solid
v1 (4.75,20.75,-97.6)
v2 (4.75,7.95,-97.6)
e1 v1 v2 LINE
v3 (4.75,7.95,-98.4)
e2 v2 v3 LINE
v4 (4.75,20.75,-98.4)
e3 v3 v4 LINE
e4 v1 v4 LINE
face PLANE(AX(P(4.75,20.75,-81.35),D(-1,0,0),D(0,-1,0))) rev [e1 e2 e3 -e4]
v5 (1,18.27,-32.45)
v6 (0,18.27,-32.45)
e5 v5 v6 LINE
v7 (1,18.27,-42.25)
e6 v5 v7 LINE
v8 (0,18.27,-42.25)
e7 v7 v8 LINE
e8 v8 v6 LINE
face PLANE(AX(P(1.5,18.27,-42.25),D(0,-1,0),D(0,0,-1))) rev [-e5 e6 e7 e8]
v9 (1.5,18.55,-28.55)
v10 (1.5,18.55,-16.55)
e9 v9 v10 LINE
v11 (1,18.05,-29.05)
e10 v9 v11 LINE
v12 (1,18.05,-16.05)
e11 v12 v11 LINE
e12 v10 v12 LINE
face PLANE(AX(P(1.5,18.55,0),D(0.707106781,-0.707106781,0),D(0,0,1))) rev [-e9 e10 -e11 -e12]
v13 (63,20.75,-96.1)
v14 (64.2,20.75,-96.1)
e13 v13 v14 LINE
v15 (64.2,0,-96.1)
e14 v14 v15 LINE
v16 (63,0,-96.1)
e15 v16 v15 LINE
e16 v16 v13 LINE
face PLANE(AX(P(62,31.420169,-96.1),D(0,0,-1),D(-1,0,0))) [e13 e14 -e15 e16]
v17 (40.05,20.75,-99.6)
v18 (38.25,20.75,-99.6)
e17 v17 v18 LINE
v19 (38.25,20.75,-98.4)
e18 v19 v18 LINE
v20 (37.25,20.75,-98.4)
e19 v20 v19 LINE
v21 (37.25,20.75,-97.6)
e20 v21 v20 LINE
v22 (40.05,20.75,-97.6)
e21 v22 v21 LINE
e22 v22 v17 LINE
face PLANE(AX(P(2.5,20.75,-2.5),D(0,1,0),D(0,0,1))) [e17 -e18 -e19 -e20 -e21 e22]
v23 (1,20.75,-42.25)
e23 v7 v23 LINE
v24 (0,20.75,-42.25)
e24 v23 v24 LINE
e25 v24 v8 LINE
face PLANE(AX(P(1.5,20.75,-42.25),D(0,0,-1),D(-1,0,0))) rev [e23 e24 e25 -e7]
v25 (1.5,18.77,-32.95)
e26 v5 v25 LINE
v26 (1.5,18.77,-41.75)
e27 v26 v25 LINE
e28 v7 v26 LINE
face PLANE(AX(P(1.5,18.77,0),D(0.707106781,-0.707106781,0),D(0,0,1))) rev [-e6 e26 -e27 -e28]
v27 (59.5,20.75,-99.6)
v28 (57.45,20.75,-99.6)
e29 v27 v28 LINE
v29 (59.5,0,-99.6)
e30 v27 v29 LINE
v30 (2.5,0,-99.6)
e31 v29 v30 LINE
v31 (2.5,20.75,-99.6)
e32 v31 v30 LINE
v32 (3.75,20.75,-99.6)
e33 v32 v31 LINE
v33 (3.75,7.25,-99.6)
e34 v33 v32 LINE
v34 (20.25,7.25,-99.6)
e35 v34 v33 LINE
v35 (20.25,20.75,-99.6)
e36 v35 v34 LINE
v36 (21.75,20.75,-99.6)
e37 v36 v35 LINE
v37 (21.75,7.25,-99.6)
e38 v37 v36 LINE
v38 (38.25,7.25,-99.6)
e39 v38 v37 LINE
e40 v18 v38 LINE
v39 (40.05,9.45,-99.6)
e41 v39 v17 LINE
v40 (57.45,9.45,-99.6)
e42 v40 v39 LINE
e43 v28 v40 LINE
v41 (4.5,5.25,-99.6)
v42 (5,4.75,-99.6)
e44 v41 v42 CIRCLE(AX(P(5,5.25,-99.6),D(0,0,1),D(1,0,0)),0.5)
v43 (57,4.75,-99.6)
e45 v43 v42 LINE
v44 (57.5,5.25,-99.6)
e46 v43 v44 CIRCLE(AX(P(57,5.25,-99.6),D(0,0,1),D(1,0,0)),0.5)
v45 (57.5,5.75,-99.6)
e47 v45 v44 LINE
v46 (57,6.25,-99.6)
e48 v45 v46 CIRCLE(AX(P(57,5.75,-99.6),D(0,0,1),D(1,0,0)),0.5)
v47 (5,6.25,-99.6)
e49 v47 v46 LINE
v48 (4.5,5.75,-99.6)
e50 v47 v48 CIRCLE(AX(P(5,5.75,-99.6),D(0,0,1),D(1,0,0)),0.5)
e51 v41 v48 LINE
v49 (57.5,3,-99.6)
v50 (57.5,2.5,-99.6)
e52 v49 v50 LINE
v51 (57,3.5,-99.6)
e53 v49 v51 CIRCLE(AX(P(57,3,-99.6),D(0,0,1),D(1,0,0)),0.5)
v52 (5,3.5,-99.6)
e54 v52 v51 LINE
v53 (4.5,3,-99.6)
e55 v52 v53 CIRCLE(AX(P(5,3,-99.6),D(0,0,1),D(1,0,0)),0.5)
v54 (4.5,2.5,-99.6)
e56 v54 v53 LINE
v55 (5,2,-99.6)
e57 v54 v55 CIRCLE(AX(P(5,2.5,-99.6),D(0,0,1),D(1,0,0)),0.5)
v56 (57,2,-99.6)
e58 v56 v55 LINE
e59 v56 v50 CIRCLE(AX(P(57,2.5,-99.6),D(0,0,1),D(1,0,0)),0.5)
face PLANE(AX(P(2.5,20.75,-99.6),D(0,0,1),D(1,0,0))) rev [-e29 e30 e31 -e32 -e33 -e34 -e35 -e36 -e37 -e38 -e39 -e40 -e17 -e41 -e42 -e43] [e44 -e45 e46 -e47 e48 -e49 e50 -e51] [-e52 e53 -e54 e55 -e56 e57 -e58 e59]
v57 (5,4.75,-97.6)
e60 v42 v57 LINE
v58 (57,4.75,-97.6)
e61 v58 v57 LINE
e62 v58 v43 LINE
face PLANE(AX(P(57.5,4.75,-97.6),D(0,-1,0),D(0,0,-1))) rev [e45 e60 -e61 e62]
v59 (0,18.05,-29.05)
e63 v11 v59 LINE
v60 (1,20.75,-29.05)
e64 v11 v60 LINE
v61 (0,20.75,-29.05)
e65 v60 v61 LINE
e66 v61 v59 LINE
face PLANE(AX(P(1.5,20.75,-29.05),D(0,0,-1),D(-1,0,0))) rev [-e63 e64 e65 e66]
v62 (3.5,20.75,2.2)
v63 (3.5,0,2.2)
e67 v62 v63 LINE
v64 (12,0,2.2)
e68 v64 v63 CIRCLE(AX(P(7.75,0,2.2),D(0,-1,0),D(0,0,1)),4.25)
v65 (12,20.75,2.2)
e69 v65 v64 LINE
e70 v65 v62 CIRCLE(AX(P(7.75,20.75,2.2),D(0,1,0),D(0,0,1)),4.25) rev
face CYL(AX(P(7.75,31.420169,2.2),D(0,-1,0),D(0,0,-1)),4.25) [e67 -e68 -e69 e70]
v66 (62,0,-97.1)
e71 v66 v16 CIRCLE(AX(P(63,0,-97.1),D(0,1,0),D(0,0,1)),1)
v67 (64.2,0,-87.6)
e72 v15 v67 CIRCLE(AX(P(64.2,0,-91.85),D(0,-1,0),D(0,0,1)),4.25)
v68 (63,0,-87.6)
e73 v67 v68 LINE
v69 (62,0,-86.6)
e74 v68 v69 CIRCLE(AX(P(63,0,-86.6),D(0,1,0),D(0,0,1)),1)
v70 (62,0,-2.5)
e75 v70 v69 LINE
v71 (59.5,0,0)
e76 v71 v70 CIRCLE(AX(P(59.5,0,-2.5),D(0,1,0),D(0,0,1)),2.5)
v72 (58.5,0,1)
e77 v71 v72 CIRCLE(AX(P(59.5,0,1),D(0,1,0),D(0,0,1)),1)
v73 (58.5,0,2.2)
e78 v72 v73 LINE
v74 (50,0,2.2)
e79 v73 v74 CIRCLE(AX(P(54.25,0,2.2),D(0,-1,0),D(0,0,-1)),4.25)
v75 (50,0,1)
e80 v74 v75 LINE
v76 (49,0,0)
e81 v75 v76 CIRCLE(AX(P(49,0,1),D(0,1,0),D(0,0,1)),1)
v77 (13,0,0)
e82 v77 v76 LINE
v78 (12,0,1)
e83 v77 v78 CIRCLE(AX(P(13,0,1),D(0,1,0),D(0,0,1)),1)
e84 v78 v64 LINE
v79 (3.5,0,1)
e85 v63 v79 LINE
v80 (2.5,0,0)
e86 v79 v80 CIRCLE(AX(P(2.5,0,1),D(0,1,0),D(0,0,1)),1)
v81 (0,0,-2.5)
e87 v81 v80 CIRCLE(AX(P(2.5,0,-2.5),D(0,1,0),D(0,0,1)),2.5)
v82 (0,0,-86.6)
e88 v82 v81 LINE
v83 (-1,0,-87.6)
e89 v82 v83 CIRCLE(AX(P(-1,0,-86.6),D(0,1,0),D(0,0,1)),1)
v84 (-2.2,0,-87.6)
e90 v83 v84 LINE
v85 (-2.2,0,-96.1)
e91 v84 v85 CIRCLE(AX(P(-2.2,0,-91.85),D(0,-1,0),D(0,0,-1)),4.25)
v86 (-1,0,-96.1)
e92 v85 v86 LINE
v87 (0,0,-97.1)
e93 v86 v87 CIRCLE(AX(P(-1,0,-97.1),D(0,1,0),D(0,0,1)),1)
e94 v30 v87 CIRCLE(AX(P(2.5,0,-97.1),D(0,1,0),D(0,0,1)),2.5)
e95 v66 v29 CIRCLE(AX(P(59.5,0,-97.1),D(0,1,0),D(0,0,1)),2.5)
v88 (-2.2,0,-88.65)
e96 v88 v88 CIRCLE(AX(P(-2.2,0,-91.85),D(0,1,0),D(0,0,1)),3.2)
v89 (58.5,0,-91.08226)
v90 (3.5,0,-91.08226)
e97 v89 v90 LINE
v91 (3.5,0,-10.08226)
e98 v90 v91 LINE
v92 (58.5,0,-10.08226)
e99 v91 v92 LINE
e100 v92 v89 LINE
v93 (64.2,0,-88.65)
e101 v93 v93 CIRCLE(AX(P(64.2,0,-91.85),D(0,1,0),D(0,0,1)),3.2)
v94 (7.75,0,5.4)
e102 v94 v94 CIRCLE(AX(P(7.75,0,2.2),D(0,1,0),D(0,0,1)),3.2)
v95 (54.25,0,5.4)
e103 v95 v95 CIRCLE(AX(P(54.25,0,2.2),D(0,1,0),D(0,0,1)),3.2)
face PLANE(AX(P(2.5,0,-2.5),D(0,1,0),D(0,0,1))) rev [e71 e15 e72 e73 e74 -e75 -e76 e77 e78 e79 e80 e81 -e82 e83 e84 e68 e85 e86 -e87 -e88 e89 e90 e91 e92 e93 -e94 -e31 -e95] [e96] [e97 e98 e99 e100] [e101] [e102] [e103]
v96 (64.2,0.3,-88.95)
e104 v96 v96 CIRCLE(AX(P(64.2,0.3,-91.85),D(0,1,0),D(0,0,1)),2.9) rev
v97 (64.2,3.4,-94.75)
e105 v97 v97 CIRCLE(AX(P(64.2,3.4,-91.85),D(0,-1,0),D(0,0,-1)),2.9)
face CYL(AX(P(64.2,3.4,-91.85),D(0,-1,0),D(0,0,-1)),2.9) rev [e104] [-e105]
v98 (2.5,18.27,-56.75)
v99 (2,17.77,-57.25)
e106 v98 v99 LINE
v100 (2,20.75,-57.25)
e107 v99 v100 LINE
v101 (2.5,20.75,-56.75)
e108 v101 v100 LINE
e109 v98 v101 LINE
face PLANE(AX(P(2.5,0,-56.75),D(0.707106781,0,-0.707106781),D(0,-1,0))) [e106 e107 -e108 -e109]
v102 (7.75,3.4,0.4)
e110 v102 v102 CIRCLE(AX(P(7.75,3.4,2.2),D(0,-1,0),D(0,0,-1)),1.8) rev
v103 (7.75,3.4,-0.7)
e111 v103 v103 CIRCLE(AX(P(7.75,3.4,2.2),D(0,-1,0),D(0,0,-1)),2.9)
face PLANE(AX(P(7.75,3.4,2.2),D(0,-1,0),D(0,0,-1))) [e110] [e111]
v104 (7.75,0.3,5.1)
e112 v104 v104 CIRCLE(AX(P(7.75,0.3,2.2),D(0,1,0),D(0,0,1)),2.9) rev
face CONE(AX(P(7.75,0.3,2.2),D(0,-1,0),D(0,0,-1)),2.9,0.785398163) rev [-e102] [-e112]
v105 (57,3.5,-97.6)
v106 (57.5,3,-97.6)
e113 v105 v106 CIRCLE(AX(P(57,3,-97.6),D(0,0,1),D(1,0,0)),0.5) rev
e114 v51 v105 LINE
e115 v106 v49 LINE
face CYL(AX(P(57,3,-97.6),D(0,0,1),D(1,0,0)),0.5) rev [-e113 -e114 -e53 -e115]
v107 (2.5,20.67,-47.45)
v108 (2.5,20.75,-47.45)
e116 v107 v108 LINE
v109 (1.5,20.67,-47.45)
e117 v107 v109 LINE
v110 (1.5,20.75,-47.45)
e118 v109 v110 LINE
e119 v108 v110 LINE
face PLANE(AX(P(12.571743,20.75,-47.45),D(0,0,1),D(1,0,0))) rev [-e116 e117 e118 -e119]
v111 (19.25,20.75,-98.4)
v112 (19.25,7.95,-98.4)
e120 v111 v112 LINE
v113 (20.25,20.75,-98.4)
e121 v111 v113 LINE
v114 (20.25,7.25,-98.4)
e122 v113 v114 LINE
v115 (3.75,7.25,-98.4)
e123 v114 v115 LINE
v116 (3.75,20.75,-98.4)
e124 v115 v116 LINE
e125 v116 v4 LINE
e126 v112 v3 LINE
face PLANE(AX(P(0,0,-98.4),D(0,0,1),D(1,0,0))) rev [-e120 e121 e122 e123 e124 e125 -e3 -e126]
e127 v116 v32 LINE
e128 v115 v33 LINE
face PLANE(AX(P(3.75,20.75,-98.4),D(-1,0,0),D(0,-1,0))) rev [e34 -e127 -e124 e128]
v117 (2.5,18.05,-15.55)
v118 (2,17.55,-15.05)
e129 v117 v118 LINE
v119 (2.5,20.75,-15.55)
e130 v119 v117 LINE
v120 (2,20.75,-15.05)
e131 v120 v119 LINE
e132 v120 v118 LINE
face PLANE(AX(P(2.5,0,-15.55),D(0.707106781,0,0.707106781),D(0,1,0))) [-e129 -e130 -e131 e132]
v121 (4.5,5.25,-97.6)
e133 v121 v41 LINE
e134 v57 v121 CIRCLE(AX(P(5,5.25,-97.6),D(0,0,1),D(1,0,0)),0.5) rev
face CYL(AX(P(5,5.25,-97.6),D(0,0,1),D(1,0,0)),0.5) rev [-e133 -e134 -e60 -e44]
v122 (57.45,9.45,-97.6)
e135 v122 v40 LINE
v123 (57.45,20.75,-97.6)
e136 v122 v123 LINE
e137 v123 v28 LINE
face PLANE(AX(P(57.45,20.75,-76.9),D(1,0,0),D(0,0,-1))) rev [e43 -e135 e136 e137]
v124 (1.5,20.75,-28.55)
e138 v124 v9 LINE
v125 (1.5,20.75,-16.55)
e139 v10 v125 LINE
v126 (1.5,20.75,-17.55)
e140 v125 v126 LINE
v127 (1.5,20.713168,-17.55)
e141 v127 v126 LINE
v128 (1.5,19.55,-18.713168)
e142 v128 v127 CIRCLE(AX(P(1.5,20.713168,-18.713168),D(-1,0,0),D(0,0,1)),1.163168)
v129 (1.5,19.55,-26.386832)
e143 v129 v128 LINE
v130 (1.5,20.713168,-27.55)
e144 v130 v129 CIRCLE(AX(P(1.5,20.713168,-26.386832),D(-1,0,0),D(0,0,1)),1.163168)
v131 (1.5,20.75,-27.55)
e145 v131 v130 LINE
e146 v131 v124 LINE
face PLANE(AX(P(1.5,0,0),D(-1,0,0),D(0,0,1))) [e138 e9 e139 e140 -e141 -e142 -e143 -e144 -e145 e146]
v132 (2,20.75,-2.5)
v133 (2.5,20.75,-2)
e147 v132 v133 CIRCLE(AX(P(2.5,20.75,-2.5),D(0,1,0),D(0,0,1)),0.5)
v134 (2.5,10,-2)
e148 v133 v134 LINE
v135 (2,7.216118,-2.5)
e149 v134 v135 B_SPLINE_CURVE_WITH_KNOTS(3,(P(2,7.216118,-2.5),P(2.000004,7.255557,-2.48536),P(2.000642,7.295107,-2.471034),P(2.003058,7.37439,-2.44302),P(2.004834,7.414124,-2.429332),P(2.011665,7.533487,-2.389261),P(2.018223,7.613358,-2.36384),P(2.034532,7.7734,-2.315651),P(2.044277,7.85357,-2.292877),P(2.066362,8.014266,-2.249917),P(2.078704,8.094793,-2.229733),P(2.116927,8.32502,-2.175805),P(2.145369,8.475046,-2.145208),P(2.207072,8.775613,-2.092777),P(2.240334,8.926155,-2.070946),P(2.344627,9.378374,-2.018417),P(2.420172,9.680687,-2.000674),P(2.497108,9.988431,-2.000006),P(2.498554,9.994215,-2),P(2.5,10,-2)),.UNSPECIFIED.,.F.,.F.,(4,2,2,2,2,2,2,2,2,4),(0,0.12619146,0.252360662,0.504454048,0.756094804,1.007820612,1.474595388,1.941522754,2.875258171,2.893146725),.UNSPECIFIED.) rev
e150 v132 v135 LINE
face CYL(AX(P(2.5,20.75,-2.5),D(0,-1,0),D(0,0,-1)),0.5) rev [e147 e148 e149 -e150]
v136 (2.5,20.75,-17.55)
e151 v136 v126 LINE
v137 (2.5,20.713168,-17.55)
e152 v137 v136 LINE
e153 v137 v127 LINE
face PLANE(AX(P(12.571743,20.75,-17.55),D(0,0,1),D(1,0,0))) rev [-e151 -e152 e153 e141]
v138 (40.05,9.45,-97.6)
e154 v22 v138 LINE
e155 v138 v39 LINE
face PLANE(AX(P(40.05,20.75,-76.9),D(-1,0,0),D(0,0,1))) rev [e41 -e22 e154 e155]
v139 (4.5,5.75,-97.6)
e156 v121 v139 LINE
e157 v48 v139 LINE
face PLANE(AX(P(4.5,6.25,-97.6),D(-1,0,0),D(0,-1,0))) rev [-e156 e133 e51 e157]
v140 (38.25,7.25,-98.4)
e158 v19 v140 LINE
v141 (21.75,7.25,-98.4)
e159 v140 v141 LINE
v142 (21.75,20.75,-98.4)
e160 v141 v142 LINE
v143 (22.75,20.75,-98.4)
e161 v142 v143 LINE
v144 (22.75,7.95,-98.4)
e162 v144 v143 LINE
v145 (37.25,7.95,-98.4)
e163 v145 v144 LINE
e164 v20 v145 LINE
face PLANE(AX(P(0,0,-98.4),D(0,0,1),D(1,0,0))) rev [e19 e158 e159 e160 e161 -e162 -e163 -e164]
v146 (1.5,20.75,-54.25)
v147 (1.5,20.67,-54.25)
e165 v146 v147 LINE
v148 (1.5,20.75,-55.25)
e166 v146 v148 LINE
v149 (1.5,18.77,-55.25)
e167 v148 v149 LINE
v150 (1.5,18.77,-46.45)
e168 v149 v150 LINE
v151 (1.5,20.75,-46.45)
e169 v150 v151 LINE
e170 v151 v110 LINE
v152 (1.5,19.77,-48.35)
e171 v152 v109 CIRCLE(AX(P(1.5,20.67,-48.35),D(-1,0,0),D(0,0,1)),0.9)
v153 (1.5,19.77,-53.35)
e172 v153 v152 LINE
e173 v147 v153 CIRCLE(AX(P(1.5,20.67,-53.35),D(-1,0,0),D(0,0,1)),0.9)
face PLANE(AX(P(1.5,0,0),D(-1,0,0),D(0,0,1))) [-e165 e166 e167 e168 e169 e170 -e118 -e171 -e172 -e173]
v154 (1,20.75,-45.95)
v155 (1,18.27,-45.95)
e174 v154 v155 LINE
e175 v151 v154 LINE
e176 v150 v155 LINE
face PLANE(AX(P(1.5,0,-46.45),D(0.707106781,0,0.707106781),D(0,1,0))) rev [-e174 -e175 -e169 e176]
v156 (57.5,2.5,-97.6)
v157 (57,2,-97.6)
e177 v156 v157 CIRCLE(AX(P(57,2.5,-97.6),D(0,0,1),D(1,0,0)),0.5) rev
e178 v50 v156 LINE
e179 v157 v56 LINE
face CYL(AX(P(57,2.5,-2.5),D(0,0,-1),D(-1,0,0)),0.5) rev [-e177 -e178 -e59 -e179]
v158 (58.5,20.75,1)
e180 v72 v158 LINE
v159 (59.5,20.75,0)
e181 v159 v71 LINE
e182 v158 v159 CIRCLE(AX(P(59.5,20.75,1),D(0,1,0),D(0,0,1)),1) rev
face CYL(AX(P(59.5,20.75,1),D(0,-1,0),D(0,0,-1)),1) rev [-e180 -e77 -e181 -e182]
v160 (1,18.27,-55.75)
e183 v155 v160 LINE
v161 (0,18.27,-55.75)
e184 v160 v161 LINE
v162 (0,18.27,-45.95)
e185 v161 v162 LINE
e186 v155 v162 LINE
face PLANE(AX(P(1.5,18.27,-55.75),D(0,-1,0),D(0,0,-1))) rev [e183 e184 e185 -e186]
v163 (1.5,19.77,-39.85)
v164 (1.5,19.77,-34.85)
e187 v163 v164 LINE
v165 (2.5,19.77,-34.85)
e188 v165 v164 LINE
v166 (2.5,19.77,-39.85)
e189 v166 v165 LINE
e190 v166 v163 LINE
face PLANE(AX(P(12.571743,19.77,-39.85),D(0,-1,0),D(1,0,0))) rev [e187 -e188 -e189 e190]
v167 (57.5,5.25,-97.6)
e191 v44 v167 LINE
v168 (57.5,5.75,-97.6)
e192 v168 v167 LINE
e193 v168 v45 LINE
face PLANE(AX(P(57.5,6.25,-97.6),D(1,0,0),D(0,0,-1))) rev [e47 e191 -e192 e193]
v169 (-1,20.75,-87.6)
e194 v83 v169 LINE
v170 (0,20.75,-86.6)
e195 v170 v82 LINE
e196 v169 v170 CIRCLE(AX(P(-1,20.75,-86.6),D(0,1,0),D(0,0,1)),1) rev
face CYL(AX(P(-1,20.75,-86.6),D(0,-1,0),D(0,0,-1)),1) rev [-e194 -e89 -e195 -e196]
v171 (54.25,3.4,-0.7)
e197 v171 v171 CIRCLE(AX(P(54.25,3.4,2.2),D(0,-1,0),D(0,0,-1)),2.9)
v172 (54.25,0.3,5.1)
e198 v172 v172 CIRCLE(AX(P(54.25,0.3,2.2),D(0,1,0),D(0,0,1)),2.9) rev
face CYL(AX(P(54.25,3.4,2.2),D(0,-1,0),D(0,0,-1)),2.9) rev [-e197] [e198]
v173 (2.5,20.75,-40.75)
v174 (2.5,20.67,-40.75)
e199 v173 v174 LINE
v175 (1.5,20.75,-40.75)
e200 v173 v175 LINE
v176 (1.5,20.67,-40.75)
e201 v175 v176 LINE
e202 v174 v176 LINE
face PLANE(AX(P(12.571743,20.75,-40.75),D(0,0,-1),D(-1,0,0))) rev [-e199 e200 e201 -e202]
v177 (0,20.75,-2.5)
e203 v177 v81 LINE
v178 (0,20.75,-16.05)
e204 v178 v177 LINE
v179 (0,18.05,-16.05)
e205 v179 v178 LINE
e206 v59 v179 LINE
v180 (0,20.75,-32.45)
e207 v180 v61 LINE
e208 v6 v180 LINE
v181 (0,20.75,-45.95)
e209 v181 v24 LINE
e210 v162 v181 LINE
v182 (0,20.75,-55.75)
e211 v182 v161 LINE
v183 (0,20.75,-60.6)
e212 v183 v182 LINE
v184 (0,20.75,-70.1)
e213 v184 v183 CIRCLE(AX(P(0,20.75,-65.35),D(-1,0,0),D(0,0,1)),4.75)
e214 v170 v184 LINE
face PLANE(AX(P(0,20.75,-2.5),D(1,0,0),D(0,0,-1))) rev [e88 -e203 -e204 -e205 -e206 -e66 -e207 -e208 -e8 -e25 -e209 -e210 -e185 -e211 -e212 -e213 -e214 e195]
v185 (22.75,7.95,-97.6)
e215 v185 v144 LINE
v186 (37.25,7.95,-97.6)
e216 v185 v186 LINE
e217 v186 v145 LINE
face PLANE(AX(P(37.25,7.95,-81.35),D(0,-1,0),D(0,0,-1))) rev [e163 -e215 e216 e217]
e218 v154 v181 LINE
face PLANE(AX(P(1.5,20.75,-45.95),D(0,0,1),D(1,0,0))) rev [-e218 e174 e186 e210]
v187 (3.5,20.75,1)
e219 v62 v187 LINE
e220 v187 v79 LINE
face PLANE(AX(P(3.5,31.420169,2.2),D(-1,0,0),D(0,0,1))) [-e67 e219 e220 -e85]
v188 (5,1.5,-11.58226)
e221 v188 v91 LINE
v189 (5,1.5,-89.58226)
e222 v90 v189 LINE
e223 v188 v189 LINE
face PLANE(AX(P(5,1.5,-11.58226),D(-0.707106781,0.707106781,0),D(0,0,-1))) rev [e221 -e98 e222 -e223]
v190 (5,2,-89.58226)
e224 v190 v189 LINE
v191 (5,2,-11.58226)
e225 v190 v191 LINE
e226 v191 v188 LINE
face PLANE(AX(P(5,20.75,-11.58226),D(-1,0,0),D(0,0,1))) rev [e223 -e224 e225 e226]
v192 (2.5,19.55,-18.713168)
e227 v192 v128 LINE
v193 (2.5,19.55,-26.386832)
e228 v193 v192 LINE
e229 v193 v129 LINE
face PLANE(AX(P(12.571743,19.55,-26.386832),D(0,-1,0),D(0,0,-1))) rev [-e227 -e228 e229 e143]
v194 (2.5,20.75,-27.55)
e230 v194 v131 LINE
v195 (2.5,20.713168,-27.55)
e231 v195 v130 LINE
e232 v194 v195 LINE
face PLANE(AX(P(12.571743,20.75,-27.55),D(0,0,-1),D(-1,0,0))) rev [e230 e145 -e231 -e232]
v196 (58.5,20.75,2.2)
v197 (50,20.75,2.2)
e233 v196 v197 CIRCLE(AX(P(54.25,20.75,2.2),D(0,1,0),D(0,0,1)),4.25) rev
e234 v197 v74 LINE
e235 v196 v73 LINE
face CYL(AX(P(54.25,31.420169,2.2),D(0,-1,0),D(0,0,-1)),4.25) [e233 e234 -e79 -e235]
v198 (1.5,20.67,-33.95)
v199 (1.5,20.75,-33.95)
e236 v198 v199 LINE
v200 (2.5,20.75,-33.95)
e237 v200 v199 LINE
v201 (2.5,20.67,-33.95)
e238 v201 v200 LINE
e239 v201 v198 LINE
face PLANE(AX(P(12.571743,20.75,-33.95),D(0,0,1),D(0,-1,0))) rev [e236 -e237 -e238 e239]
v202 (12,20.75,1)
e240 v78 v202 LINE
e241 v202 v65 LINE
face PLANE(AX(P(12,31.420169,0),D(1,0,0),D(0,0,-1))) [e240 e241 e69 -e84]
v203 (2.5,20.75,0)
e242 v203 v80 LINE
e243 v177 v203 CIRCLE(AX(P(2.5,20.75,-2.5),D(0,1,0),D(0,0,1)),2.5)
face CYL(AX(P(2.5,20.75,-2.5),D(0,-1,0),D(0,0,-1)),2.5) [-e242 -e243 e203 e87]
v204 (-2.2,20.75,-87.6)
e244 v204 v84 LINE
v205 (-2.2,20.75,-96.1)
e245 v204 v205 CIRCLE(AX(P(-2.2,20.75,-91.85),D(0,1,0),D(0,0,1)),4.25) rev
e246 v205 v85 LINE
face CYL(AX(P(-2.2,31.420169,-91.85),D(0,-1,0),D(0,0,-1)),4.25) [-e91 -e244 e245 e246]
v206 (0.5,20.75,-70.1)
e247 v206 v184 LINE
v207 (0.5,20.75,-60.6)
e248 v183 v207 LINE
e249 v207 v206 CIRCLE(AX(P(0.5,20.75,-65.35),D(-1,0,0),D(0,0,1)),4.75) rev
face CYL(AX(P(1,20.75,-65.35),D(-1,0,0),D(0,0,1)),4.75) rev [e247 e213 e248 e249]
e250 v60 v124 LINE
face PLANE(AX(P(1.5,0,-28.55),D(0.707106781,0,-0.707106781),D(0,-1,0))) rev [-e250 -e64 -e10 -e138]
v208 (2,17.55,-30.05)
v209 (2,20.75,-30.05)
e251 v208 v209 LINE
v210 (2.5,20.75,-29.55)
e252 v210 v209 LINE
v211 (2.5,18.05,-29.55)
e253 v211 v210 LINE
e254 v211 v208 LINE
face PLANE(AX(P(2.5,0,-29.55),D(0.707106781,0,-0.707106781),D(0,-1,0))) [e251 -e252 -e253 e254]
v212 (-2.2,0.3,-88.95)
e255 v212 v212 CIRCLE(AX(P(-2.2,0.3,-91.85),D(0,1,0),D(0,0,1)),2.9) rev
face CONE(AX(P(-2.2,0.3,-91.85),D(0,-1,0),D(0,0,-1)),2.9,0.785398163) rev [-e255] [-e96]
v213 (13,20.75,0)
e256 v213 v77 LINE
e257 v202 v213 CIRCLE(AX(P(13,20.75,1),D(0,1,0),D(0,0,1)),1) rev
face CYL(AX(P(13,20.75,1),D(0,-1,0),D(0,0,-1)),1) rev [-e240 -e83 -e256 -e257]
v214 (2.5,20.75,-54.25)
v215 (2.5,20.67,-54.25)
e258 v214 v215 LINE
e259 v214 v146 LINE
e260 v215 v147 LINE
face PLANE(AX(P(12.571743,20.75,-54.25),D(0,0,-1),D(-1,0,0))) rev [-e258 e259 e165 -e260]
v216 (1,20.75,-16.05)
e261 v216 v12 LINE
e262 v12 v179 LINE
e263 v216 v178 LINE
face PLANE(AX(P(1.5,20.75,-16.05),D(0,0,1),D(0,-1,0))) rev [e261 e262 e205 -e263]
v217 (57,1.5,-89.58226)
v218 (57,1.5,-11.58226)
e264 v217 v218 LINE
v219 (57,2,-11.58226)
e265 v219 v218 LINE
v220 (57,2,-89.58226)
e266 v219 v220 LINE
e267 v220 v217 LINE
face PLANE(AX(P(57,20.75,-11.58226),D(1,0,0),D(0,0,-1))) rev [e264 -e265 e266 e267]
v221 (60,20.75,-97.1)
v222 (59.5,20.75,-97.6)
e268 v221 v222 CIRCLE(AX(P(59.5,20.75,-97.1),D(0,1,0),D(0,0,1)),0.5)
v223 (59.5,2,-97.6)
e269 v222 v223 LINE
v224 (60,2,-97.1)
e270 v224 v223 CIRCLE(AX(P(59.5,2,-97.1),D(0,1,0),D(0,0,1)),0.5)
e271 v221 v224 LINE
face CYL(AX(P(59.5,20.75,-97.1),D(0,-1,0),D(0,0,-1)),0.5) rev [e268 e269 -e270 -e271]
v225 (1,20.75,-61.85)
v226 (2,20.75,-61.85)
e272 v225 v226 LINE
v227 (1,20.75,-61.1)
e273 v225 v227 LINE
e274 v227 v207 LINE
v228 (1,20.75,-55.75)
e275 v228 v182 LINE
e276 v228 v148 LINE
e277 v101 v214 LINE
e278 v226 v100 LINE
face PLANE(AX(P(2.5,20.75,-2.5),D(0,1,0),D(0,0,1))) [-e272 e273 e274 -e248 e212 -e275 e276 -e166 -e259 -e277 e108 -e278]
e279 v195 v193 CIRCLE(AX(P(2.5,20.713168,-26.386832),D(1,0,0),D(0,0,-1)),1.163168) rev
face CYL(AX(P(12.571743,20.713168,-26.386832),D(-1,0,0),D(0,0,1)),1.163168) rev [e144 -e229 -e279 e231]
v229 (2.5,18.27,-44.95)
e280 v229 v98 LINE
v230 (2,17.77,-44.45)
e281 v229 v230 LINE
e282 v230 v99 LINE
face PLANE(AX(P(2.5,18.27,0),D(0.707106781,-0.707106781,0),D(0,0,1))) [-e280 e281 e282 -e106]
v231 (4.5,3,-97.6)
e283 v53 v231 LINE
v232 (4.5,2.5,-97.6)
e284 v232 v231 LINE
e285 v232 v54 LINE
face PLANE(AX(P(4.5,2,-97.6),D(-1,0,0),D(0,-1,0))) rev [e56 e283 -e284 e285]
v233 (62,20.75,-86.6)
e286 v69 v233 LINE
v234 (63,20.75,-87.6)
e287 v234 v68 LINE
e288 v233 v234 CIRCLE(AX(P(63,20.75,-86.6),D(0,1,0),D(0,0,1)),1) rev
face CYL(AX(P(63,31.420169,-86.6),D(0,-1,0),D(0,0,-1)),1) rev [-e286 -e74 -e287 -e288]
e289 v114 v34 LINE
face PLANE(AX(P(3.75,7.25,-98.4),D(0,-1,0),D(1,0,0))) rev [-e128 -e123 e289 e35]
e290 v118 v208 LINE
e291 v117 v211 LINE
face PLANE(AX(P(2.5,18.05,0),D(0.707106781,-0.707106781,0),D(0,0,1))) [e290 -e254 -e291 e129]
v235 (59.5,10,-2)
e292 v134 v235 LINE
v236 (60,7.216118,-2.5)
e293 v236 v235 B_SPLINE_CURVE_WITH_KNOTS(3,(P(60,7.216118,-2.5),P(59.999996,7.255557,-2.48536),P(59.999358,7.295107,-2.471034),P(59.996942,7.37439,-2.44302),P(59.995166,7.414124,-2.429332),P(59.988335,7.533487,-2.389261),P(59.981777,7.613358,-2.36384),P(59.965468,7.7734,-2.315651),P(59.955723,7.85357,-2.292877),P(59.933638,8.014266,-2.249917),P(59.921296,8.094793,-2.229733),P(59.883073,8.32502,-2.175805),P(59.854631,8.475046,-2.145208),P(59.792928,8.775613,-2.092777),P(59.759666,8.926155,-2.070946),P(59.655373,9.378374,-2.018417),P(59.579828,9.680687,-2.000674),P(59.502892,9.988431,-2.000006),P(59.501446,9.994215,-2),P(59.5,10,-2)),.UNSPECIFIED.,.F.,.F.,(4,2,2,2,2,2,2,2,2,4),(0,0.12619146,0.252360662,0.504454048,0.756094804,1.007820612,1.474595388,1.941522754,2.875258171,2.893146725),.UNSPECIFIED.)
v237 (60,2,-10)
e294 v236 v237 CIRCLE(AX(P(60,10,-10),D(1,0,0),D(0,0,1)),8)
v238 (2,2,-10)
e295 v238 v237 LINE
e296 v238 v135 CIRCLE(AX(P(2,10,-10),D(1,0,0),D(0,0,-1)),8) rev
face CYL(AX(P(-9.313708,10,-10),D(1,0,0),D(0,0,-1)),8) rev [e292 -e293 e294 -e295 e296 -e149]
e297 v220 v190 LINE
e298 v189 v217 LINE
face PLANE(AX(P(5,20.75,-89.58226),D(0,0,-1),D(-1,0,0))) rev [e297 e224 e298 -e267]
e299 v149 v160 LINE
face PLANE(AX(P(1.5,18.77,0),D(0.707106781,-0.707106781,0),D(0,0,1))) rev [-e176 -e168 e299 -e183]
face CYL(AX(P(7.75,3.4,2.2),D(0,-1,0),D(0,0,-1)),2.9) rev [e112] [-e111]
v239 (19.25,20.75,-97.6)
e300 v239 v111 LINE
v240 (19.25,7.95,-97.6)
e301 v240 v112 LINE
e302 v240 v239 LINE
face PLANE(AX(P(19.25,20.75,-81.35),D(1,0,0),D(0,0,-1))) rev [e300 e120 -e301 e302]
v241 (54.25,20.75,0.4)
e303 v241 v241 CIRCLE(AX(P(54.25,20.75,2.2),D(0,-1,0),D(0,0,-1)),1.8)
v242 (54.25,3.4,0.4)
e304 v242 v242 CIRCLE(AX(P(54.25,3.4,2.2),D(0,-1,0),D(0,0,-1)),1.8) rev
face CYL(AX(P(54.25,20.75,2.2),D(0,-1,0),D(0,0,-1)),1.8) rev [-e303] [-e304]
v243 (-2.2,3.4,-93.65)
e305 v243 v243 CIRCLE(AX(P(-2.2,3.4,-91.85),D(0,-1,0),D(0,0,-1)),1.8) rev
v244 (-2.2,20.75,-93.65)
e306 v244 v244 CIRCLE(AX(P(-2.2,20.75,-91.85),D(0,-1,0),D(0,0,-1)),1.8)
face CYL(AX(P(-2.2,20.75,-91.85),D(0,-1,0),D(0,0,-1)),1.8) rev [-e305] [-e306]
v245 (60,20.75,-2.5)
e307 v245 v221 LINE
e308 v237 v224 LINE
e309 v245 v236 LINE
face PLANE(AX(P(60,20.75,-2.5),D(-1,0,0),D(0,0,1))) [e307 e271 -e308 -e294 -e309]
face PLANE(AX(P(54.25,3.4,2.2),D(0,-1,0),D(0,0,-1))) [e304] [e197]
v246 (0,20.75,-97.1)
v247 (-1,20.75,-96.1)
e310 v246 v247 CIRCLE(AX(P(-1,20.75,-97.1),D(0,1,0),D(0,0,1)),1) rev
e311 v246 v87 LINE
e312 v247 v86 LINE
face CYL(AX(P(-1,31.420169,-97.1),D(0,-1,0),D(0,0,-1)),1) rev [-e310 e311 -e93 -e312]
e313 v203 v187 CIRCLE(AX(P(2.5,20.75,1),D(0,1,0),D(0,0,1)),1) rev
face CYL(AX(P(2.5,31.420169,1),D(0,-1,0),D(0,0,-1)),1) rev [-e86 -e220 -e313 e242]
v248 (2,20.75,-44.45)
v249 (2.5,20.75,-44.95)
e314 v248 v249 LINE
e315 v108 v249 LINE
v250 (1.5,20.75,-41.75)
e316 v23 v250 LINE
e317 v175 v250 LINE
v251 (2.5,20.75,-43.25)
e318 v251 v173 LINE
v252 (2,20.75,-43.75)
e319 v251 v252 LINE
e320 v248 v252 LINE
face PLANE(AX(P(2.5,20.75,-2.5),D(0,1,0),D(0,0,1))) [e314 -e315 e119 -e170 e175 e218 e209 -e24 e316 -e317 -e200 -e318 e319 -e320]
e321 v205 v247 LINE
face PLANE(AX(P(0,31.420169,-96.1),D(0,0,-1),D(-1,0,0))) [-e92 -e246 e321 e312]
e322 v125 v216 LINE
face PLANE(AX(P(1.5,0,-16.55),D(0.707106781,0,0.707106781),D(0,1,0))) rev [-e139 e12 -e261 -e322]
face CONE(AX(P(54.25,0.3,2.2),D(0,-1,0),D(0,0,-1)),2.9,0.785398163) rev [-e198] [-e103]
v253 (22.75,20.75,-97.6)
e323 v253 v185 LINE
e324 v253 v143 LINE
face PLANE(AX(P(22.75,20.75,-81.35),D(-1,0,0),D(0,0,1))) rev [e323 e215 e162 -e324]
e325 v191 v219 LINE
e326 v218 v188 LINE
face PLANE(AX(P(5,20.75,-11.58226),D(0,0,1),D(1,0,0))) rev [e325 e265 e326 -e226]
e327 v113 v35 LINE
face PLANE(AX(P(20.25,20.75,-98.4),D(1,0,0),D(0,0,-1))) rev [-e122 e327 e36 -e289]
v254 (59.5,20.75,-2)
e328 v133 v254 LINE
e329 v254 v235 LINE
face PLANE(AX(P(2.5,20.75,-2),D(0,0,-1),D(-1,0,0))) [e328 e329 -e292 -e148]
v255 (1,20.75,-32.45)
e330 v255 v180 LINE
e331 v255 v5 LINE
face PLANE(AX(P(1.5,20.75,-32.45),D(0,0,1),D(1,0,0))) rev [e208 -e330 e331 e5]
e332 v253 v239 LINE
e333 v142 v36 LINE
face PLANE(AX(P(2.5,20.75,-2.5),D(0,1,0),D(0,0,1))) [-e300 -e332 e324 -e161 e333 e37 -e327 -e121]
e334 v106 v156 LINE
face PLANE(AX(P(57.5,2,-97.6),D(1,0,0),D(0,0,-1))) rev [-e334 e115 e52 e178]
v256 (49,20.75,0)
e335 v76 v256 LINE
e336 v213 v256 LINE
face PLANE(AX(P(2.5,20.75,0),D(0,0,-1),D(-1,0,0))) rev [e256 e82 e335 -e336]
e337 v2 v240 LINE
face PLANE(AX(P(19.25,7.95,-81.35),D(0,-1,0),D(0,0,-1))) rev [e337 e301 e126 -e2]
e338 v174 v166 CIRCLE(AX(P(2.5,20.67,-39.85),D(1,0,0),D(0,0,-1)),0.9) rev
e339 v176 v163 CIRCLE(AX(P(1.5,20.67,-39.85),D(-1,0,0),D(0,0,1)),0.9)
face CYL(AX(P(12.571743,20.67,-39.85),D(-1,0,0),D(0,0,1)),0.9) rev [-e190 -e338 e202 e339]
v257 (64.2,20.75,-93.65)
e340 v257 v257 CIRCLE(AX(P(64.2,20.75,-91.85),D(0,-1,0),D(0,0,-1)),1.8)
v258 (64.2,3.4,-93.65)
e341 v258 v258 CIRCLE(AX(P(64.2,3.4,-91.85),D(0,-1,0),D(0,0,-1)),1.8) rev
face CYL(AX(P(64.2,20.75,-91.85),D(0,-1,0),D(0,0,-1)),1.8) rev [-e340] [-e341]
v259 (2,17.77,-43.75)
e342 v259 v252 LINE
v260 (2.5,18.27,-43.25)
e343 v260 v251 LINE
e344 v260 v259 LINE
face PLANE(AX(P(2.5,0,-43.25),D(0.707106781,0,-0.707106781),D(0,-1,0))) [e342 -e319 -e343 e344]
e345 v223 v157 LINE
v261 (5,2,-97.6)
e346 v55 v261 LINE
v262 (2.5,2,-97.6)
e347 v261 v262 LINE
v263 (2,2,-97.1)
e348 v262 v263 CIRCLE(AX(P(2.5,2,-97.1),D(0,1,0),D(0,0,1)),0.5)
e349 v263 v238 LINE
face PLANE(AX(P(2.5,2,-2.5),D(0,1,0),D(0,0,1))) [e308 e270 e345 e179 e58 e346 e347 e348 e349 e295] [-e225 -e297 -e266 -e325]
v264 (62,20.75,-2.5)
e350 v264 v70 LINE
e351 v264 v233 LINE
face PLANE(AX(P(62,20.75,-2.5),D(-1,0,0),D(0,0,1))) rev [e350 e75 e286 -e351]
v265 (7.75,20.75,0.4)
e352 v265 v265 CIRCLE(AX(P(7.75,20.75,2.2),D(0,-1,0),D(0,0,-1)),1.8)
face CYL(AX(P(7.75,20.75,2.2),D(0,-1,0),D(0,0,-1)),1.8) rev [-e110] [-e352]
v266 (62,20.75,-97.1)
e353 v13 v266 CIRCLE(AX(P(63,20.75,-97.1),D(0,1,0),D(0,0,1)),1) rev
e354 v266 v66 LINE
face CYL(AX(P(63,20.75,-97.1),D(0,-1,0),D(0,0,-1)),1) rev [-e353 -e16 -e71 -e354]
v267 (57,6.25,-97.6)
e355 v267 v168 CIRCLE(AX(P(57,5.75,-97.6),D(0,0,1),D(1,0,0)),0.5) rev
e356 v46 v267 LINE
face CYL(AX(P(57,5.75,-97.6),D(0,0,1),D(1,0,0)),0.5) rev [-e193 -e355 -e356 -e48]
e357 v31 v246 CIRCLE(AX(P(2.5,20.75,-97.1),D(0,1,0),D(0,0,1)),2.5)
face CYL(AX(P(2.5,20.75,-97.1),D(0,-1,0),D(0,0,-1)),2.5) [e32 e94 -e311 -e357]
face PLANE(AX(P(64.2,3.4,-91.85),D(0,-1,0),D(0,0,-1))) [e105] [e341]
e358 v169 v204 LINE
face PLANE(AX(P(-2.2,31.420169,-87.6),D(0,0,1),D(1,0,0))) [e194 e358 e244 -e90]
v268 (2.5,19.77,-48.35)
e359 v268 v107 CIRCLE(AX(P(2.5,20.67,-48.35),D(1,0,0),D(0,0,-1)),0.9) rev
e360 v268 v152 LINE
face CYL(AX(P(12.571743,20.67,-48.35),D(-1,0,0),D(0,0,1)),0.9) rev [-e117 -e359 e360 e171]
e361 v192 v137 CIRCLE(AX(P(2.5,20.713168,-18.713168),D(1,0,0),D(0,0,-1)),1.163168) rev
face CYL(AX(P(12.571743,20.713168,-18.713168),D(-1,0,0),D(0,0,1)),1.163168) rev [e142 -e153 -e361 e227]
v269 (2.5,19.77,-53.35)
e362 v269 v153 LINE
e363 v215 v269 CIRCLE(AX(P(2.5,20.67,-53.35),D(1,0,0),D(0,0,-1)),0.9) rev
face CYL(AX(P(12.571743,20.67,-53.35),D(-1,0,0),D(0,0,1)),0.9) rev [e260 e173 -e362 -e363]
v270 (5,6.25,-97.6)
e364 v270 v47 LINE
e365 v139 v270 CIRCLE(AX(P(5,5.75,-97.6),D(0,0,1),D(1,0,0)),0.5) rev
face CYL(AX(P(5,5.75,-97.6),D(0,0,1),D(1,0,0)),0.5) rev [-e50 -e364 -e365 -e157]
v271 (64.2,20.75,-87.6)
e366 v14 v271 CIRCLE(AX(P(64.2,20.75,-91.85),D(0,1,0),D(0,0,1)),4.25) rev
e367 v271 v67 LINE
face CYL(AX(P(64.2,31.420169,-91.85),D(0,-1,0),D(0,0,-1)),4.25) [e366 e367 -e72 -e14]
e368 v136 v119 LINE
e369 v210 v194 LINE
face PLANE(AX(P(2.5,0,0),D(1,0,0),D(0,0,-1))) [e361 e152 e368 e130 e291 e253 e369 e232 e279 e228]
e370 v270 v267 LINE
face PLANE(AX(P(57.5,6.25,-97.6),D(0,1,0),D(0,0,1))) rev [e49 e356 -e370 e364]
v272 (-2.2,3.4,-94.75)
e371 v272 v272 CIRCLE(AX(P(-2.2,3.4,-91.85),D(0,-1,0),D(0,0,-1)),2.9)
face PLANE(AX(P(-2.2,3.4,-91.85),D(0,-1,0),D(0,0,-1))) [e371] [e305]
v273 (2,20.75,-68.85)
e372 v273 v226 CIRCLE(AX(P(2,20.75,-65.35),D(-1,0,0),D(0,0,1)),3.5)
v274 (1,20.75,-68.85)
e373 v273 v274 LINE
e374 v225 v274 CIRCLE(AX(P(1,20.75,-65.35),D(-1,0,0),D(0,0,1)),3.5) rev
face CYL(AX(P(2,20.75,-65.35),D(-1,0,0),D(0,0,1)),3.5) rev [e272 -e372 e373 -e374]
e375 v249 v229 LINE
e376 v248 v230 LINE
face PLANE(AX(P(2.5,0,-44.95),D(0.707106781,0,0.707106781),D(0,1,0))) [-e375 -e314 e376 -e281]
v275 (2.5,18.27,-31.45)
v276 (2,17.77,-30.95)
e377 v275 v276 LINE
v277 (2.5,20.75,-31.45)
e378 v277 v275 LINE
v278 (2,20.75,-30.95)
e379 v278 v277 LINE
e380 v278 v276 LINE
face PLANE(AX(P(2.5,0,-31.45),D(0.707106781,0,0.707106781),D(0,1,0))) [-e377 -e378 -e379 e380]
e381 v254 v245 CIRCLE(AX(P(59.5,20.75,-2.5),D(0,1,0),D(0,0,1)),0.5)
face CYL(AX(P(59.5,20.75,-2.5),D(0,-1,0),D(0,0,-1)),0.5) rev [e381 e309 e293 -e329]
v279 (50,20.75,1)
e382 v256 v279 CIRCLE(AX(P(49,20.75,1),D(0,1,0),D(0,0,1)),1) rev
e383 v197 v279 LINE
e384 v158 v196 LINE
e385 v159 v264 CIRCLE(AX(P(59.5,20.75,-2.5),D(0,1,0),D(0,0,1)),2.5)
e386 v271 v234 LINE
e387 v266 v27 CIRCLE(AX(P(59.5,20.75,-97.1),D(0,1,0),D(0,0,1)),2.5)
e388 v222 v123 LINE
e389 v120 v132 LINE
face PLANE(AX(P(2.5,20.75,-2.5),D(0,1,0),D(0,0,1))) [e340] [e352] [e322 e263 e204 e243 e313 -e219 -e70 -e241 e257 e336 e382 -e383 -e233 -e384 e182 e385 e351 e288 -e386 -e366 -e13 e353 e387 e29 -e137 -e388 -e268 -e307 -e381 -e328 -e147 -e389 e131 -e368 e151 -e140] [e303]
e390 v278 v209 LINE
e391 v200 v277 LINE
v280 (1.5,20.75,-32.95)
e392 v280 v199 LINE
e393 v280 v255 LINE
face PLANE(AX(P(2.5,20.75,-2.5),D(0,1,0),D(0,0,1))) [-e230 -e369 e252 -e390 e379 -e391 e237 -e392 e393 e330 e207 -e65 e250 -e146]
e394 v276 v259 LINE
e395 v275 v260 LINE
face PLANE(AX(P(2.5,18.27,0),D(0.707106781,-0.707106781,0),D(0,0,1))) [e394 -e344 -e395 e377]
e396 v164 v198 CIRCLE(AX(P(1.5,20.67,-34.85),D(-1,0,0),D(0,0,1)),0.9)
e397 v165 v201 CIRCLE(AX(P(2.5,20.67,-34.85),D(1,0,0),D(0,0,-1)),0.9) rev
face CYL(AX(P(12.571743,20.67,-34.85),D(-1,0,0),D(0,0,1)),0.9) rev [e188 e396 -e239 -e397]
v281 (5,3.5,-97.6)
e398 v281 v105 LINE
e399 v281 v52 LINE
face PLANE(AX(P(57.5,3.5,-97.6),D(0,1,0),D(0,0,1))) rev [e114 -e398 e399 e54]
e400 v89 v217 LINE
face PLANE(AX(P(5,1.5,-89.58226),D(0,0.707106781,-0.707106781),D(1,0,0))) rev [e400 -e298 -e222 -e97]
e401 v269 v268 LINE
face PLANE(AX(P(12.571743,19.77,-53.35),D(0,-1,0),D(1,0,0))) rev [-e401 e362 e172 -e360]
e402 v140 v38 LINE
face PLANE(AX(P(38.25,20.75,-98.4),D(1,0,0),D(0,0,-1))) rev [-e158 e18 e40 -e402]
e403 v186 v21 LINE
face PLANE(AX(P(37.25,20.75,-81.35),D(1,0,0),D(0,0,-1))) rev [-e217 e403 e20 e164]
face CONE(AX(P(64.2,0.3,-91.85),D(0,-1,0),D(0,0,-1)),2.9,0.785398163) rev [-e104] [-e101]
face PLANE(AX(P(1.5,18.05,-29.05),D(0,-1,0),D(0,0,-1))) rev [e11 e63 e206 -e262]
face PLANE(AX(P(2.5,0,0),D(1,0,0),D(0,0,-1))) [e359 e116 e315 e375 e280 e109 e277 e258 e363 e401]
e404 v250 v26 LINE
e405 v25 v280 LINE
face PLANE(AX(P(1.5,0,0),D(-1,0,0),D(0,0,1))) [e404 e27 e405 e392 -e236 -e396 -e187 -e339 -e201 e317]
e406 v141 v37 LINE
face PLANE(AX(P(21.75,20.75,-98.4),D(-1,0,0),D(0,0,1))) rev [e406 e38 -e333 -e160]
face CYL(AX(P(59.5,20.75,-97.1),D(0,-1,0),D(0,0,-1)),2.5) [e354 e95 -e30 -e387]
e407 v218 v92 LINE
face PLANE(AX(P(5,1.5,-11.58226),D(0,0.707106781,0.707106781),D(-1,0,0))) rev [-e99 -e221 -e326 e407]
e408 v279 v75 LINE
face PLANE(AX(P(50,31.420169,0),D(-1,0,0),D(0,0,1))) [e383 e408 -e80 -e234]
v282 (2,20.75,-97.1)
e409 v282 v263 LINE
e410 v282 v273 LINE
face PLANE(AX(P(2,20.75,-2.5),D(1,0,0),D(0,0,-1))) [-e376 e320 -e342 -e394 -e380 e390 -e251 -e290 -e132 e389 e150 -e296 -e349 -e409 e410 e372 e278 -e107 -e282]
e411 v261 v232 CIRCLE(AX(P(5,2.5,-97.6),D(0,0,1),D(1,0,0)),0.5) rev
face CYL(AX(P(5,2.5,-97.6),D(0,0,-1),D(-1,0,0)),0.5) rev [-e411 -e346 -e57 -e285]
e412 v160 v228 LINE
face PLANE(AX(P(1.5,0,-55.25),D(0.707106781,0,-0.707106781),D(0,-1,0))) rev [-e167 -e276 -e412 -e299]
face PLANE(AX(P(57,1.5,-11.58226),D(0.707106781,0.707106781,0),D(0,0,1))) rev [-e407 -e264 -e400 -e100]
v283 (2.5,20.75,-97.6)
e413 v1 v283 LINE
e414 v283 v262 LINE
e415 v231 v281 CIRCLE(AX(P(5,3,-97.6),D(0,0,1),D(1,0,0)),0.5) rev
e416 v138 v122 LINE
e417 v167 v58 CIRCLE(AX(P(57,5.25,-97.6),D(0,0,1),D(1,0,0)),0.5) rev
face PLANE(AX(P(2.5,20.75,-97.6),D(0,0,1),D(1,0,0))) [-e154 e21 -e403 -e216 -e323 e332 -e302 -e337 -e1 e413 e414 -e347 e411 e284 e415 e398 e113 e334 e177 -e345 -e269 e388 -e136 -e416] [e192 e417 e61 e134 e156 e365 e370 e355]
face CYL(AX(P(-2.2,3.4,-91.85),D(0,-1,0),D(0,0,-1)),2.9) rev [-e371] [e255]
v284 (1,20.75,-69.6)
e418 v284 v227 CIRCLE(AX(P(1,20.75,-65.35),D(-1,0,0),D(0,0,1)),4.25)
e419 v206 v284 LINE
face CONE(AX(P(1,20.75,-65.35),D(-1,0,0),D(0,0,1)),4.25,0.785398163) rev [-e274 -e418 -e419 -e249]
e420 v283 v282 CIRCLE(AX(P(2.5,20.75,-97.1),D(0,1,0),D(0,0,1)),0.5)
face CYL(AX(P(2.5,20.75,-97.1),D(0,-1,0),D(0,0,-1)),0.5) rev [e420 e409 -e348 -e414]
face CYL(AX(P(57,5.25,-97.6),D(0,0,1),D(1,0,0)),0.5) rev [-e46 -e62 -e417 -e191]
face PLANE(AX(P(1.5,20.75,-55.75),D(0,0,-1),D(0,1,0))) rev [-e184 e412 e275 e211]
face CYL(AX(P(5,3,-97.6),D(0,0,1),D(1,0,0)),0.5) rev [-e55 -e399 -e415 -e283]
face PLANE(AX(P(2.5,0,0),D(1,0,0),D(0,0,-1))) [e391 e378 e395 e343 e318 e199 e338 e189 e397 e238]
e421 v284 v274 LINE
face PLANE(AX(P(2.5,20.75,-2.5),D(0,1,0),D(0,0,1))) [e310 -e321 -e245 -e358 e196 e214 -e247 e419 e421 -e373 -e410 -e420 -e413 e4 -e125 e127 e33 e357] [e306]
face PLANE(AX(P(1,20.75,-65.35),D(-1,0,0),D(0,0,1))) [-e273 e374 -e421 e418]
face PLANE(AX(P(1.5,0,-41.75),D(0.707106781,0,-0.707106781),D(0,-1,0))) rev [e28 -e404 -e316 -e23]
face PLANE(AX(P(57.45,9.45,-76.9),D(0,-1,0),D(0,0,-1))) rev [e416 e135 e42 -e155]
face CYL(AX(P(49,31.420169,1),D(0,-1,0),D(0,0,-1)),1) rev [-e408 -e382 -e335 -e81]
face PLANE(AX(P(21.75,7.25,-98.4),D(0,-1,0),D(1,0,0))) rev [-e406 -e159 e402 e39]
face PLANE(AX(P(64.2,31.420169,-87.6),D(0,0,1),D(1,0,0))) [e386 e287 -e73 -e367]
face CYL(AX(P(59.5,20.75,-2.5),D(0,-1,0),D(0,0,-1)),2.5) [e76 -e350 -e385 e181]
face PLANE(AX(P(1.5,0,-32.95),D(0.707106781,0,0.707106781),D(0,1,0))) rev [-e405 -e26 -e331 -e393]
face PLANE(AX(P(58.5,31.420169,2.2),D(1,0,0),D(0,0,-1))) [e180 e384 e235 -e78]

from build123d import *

# Parameters (mm, degrees)
BASE_DEPTH                      = 20.75
SHELL_T                         = -2
CLAMPS_DEPTH                    = 20.75
CLAMP_FILLETS_R                 = 1
SKETCH20_R                      = 1.8
CLAMP_HOLES_DEPTH               = 123.621878146
SKETCH21_R                      = 2.9
CLAMP_COUNTERSINKS_DEPTH        = 3.4
CLAMP_COUNTERSINK_CHAMFERS_SIZE = 0.3
SKETCH24_W                      = 14.5
SKETCH24_H                      = 12.8
USB_CUTOUT_DEPTH                = 18.25
SKETCH25_W                      = 16.5
SKETCH25_H                      = 13.5
USB_APPROACH_DEPTH              = 1.2
SKETCH28_W                      = 17.4
SKETCH28_H                      = 11.3
RJ45_CUTOUT_DEPTH               = 22.7
SKETCH29_W                      = 15
SKETCH29_H                      = 3.2
USB_C_SUPPORT_DEPTH             = 0.5
USB_C_SUPPORT_CHAMFER_SIZE      = 0.5
SKETCH30_W                      = 13
SKETCH30_H                      = 2.7
USB_C_APPROACH_DEPTH            = 1.5
USB_C_APPROACH_CHAMFER_SIZE     = 0.5
SKETCH36_W                      = 9.8
SKETCH36_H                      = 2.48
HDMI_APPROACH_DEPTH             = 1.5
HDMI_APPROACH_CHAMFER_SIZE      = 0.5
SKETCH37_W                      = 12.8
SKETCH37_H                      = 2.98
HDMI_SUPPORT_DEPTH              = 0.5
HDMI_SUPPORT_CHAMFER_SIZE       = 0.5
HDMI_CUTOUT_DEPTH               = 1
SKETCH32_R                      = 3.5
AUDIO_CUTOUT_DEPTH              = 2
SKETCH33_R                      = 4.75
AUDIO_APPROACH_DEPTH            = 1
AUDIO_APPROACH_CHAMFER_SIZE     = 0.5
AIR_SCOOP_REACH                 = 123.517
SKETCH41_W                      = 53
SKETCH41_H                      = 1.5
VENT_DEPTH                      = 2
VENT_FILLET_R                   = 0.5
SKETCH40_W                      = 52
SKETCH40_H                      = 78
SCREEN_CUTOUT_DEPTH             = 123.621878163
CHAMFER1_SIZE                   = 1.5


with BuildPart() as part:
    # Sketch2 → Base (new body)
    with BuildSketch(Plane(origin=(0, 0, 0), x_dir=(1, 0, 0), z_dir=(0, 1, 0))):
        with BuildLine():
            Line((2.5, 0), (59.5, 0))
            ThreePointArc((59.5, 0), (61.267766953, 0.732233047), (62, 2.5))
            Line((62, 2.5), (62, 97.1))
            ThreePointArc((62, 97.1), (61.267766953, 98.867766953), (59.5, 99.6))
            Line((59.5, 99.6), (2.5, 99.6))
            ThreePointArc((2.5, 99.6), (0.732233047, 98.867766953), (0, 97.1))
            Line((0, 97.1), (0, 2.5))
            ThreePointArc((0, 2.5), (0.732233047, 0.732233047), (2.5, 0))
        make_face()
    extrude(amount=BASE_DEPTH)

    # Shell
    shell_openings = [part.faces().sort_by_distance(p)[0] for p in [
        (31, 20.75, -49.8),
    ]]
    offset(amount=SHELL_T, openings=shell_openings, kind=Kind.INTERSECTION)

    # Sketch14 → Clamps (add)
    with BuildSketch(Plane.XZ):
        with BuildLine():
            Line((-2.2, -87.6), (0, -87.6))
            Line((0, -87.6), (0, -96.1))
            Line((0, -96.1), (-2.2, -96.1))
            ThreePointArc((-2.2, -96.1), (-6.45, -91.85), (-2.2, -87.6))
        make_face()
        with BuildLine():
            Line((3.5, 2.2), (3.5, 0))
            Line((3.5, 0), (12, 0))
            Line((12, 0), (12, 2.2))
            ThreePointArc((12, 2.2), (7.75, 6.45), (3.5, 2.2))
        make_face()
        with BuildLine():
            Line((64.2, -87.6), (62, -87.6))
            Line((62, -87.6), (62, -96.1))
            Line((62, -96.1), (64.2, -96.1))
            ThreePointArc((64.2, -96.1), (68.45, -91.85), (64.2, -87.6))
        make_face()
        with BuildLine():
            Line((50, 0), (50, 2.2))
            ThreePointArc((50, 2.2), (54.25, 6.45), (58.5, 2.2))
            Line((58.5, 2.2), (58.5, 0))
            Line((58.5, 0), (50, 0))
        make_face()
    extrude(amount=-CLAMPS_DEPTH)

    # Clamp Fillets
    clamp_fillets_edges = [part.edges().sort_by_distance(p)[0] for p in [
        (0, 10.375, -96.1),
        (0, 10.375, -87.6),
        (3.5, 10.375, 0),
        (12, 10.375, 0),
        (62, 10.375, -87.6),
        (62, 10.375, -96.1),
        (50, 10.375, 0),
        (58.5, 10.375, 0),
    ]]
    fillet(clamp_fillets_edges, radius=CLAMP_FILLETS_R - 0.0001)  # a hair under: the kernel refuses the full size

    # Sketch20 → Clamp Holes (cut, through all)
    with BuildSketch(Plane.XZ):
        with Locations(Location((7.75, 2.2, 0), (0, 0, 270))):
            Circle(SKETCH20_R)
        with Locations(Location((54.25, 2.2, 0), (0, 0, 270))):
            Circle(SKETCH20_R)
        with Locations(Location((64.2, -91.85, 0), (0, 0, 270))):
            Circle(SKETCH20_R)
        with Locations(Location((-2.2, -91.85, 0), (0, 0, 270))):
            Circle(SKETCH20_R)
    extrude(amount=-CLAMP_HOLES_DEPTH, mode=Mode.SUBTRACT)

    # Sketch21 → Clamp Countersinks (cut)
    with BuildSketch(Plane.XZ):
        with Locations(Location((7.75, 2.2, 0), (0, 0, 270))):
            Circle(SKETCH21_R)
        with Locations(Location((54.25, 2.2, 0), (0, 0, 270))):
            Circle(SKETCH21_R)
        with Locations(Location((64.2, -91.85, 0), (0, 0, 270))):
            Circle(SKETCH21_R)
        with Locations(Location((-2.2, -91.85, 0), (0, 0, 270))):
            Circle(SKETCH21_R)
    extrude(amount=-CLAMP_COUNTERSINKS_DEPTH, mode=Mode.SUBTRACT)

    # Clamp Countersink Chamfers
    clamp_countersink_chamfers_edges = [part.edges().sort_by_distance(p)[0] for p in [
        (-2.2, 0, -88.95),
        (64.2, 0, -88.95),
        (54.25, 0, 5.1),
        (7.75, 0, 5.1),
    ]]
    chamfer(clamp_countersink_chamfers_edges, length=CLAMP_COUNTERSINK_CHAMFERS_SIZE)

    # Sketch24 → USB Cutout (cut)
    with BuildSketch(Plane(origin=(0, 0, -99.6), x_dir=(-1, 0, 0), z_dir=(0, 0, -1))):
        with Locations((-30, 14.35)):
            Rectangle(SKETCH24_W, SKETCH24_H)
        with Locations((-12, 14.35)):
            Rectangle(SKETCH24_W, SKETCH24_H)
    extrude(amount=-USB_CUTOUT_DEPTH, mode=Mode.SUBTRACT)

    # Sketch25 → USB Approach (cut)
    with BuildSketch(Plane(origin=(0, 0, -99.6), x_dir=(-1, 0, 0), z_dir=(0, 0, -1))):
        with Locations((-30, 14)):
            Rectangle(SKETCH25_W, SKETCH25_H)
        with Locations((-12, 14)):
            Rectangle(SKETCH25_W, SKETCH25_H)
    extrude(amount=-USB_APPROACH_DEPTH, mode=Mode.SUBTRACT)

    # Sketch28 → RJ45 Cutout (cut)
    with BuildSketch(Plane(origin=(0, 0, -99.6), x_dir=(-1, 0, 0), z_dir=(0, 0, -1))):
        with Locations((-48.75, 15.1)):
            Rectangle(SKETCH28_W, SKETCH28_H)
    extrude(amount=-RJ45_CUTOUT_DEPTH, mode=Mode.SUBTRACT)

    # Sketch29 → USB-C Support (add)
    with BuildSketch(Plane(origin=(2, 0, 0), x_dir=(0, 0, -1), z_dir=(1, 0, 0))):
        with Locations((22.55, 19.15)):
            Rectangle(SKETCH29_W, SKETCH29_H)
    extrude(amount=USB_C_SUPPORT_DEPTH)

    # USB-C Support Chamfer
    usb_c_support_chamfer_edges = [part.edges().sort_by_distance(p)[0] for p in [
        (2.5, 19.15, -30.05),
        (2.5, 17.55, -22.55),
        (2.5, 19.15, -15.05),
    ]]
    chamfer(usb_c_support_chamfer_edges, length=USB_C_SUPPORT_CHAMFER_SIZE - 0.0001)  # a hair under: the kernel refuses the full size

    # Sketch30 → USB-C Approach (cut)
    with BuildSketch(Plane.ZY):
        with Locations((-22.55, 19.4)):
            Rectangle(SKETCH30_W, SKETCH30_H)
    extrude(amount=-USB_C_APPROACH_DEPTH, mode=Mode.SUBTRACT)

    # USB-C Approach Chamfer
    usb_c_approach_chamfer_edges = [part.edges().sort_by_distance(p)[0] for p in [
        (1.5, 19.4, -29.05),
        (1.5, 19.4, -16.05),
        (1.5, 18.05, -22.55),
    ]]
    chamfer(usb_c_approach_chamfer_edges, length=USB_C_APPROACH_CHAMFER_SIZE)

    # Sketch36 → HDMI Approach (cut)
    with BuildSketch(Plane.ZY):
        with Locations((-50.85, 19.51)):
            Rectangle(SKETCH36_W, SKETCH36_H)
        with Locations((-37.35, 19.51)):
            Rectangle(SKETCH36_W, SKETCH36_H)
    extrude(amount=-HDMI_APPROACH_DEPTH, mode=Mode.SUBTRACT)

    # HDMI Approach Chamfer
    hdmi_approach_chamfer_edges = [part.edges().sort_by_distance(p)[0] for p in [
        (1.5, 19.51, -55.75),
        (1.5, 19.51, -45.95),
        (1.5, 18.27, -50.85),
        (1.5, 19.51, -42.25),
        (1.5, 19.51, -32.45),
        (1.5, 18.27, -37.35),
    ]]
    chamfer(hdmi_approach_chamfer_edges, length=HDMI_APPROACH_CHAMFER_SIZE)

    # Sketch37 → HDMI Support (add)
    with BuildSketch(Plane(origin=(2, 0, 0), x_dir=(0, 0, -1), z_dir=(1, 0, 0))):
        with Locations((37.35, 19.26)):
            Rectangle(SKETCH37_W, SKETCH37_H)
        with Locations((50.85, 19.26)):
            Rectangle(SKETCH37_W, SKETCH37_H)
    extrude(amount=HDMI_SUPPORT_DEPTH)

    # HDMI Support Chamfer
    hdmi_support_chamfer_edges = [part.edges().sort_by_distance(p)[0] for p in [
        (2.5, 19.26, -57.25),
        (2.5, 17.77, -50.85),
        (2.5, 19.26, -44.45),
        (2.5, 19.26, -43.75),
        (2.5, 17.77, -37.35),
        (2.5, 19.26, -30.95),
    ]]
    chamfer(hdmi_support_chamfer_edges, length=HDMI_SUPPORT_CHAMFER_SIZE - 0.0001)  # a hair under: the kernel refuses the full size

    # Sketch38 → HDMI Cutout (cut)
    with BuildSketch(Plane.ZY.offset(-1.5)):
        with BuildLine():
            Line((-54.25, 20.75), (-47.45, 20.75))
            Line((-47.45, 20.75), (-47.45, 20.67))
            ThreePointArc((-47.45, 20.67), (-47.713603897, 20.033603897), (-48.35, 19.77))
            Line((-48.35, 19.77), (-53.35, 19.77))
            ThreePointArc((-53.35, 19.77), (-53.986396103, 20.033603897), (-54.25, 20.67))
            Line((-54.25, 20.67), (-54.25, 20.75))
        make_face()
        with BuildLine():
            Line((-40.75, 20.75), (-33.95, 20.75))
            Line((-33.95, 20.75), (-33.95, 20.67))
            ThreePointArc((-33.95, 20.67), (-34.213603897, 20.033603897), (-34.85, 19.77))
            Line((-34.85, 19.77), (-39.85, 19.77))
            ThreePointArc((-39.85, 19.77), (-40.486396103, 20.033603897), (-40.75, 20.67))
            Line((-40.75, 20.67), (-40.75, 20.75))
        make_face()
        with BuildLine():
            Line((-27.55, 20.75), (-17.55, 20.75))
            Line((-17.55, 20.75), (-17.55, 20.713167547))
            ThreePointArc((-17.55, 20.713167547), (-17.890683887, 19.890683887), (-18.713167547, 19.55))
            Line((-18.713167547, 19.55), (-26.386832453, 19.55))
            ThreePointArc((-26.386832453, 19.55), (-27.209316113, 19.890683887), (-27.55, 20.713167547))
            Line((-27.55, 20.713167547), (-27.55, 20.75))
        make_face()
    extrude(amount=-HDMI_CUTOUT_DEPTH, mode=Mode.SUBTRACT)

    # Sketch32 → Audio Cutout (cut)
    with BuildSketch(Plane.ZY):
        with Locations((-65.35, 20.75)):
            Circle(SKETCH32_R)
    extrude(amount=-AUDIO_CUTOUT_DEPTH, mode=Mode.SUBTRACT)

    # Sketch33 → Audio Approach (cut)
    with BuildSketch(Plane.ZY):
        with Locations((-65.35, 20.75)):
            Circle(SKETCH33_R)
    extrude(amount=-AUDIO_APPROACH_DEPTH, mode=Mode.SUBTRACT)

    # Audio Approach Chamfer
    audio_approach_chamfer_edges = [part.edges().sort_by_distance(p)[0] for p in [
        (1, 16, -65.35),
    ]]
    chamfer(audio_approach_chamfer_edges, length=AUDIO_APPROACH_CHAMFER_SIZE)

    # Air Scoop: up to this face of the body (flat: up to its plane)
    air_scoop_end = Plane(part.part.faces().sort_by_distance((2, 10.683962064, -50.685539842))[0])
    # Sketch39 → Air Scoop (add, up to the picked face)
    with BuildSketch(Plane.ZY.offset(-60), mode=Mode.PRIVATE) as air_scoop_sk1:
        with BuildLine():
            Line((-2, 2), (-10, 2))
            ThreePointArc((-10, 2), (-4.343145751, 4.343145751), (-2, 10))
            Line((-2, 10), (-2, 2))
        make_face()
    air_scoop_tool1 = split(extrude(air_scoop_sk1.sketch, amount=AIR_SCOOP_REACH, mode=Mode.PRIVATE), bisect_by=air_scoop_end, keep=Keep.BOTH, mode=Mode.PRIVATE)
    add(air_scoop_tool1.solids().sort_by(Axis((60, 3.786944, -3.786944), (-1, 0, 0)))[0])

    # Sketch41 → Vent (cut)
    with BuildSketch(Plane(origin=(0, 0, -99.6), x_dir=(-1, 0, 0), z_dir=(0, 0, -1))):
        with Locations((-31, 5.5)):
            Rectangle(SKETCH41_W, SKETCH41_H)
        with Locations((-31, 2.75)):
            Rectangle(SKETCH41_W, SKETCH41_H)
    extrude(amount=-VENT_DEPTH, mode=Mode.SUBTRACT)

    # Vent Fillet
    vent_fillet_edges = [part.edges().sort_by_distance(p)[0] for p in [
        (57.5, 4.75, -98.6),
        (57.5, 6.25, -98.6),
        (4.5, 6.25, -98.6),
        (4.5, 4.75, -98.6),
        (57.5, 2, -98.6),
        (57.5, 3.5, -98.6),
        (4.5, 3.5, -98.6),
        (4.5, 2, -98.6),
    ]]
    fillet(vent_fillet_edges, radius=VENT_FILLET_R)

    # Sketch40 → Screen Cutout (cut, through all)
    with BuildSketch(Plane.XZ):
        with Locations((31, -50.58226)):
            Rectangle(SKETCH40_W, SKETCH40_H)
    extrude(amount=-SCREEN_CUTOUT_DEPTH, mode=Mode.SUBTRACT)

    # Chamfer1
    chamfer1_edges = [part.edges().sort_by_distance(p)[0] for p in [
        (5, 0, -50.58226),
        (31, 0, -89.58226),
        (57, 0, -50.58226),
        (31, 0, -11.58226),
    ]]
    chamfer(chamfer1_edges, length=CHAMFER1_SIZE)


solid = part.part
